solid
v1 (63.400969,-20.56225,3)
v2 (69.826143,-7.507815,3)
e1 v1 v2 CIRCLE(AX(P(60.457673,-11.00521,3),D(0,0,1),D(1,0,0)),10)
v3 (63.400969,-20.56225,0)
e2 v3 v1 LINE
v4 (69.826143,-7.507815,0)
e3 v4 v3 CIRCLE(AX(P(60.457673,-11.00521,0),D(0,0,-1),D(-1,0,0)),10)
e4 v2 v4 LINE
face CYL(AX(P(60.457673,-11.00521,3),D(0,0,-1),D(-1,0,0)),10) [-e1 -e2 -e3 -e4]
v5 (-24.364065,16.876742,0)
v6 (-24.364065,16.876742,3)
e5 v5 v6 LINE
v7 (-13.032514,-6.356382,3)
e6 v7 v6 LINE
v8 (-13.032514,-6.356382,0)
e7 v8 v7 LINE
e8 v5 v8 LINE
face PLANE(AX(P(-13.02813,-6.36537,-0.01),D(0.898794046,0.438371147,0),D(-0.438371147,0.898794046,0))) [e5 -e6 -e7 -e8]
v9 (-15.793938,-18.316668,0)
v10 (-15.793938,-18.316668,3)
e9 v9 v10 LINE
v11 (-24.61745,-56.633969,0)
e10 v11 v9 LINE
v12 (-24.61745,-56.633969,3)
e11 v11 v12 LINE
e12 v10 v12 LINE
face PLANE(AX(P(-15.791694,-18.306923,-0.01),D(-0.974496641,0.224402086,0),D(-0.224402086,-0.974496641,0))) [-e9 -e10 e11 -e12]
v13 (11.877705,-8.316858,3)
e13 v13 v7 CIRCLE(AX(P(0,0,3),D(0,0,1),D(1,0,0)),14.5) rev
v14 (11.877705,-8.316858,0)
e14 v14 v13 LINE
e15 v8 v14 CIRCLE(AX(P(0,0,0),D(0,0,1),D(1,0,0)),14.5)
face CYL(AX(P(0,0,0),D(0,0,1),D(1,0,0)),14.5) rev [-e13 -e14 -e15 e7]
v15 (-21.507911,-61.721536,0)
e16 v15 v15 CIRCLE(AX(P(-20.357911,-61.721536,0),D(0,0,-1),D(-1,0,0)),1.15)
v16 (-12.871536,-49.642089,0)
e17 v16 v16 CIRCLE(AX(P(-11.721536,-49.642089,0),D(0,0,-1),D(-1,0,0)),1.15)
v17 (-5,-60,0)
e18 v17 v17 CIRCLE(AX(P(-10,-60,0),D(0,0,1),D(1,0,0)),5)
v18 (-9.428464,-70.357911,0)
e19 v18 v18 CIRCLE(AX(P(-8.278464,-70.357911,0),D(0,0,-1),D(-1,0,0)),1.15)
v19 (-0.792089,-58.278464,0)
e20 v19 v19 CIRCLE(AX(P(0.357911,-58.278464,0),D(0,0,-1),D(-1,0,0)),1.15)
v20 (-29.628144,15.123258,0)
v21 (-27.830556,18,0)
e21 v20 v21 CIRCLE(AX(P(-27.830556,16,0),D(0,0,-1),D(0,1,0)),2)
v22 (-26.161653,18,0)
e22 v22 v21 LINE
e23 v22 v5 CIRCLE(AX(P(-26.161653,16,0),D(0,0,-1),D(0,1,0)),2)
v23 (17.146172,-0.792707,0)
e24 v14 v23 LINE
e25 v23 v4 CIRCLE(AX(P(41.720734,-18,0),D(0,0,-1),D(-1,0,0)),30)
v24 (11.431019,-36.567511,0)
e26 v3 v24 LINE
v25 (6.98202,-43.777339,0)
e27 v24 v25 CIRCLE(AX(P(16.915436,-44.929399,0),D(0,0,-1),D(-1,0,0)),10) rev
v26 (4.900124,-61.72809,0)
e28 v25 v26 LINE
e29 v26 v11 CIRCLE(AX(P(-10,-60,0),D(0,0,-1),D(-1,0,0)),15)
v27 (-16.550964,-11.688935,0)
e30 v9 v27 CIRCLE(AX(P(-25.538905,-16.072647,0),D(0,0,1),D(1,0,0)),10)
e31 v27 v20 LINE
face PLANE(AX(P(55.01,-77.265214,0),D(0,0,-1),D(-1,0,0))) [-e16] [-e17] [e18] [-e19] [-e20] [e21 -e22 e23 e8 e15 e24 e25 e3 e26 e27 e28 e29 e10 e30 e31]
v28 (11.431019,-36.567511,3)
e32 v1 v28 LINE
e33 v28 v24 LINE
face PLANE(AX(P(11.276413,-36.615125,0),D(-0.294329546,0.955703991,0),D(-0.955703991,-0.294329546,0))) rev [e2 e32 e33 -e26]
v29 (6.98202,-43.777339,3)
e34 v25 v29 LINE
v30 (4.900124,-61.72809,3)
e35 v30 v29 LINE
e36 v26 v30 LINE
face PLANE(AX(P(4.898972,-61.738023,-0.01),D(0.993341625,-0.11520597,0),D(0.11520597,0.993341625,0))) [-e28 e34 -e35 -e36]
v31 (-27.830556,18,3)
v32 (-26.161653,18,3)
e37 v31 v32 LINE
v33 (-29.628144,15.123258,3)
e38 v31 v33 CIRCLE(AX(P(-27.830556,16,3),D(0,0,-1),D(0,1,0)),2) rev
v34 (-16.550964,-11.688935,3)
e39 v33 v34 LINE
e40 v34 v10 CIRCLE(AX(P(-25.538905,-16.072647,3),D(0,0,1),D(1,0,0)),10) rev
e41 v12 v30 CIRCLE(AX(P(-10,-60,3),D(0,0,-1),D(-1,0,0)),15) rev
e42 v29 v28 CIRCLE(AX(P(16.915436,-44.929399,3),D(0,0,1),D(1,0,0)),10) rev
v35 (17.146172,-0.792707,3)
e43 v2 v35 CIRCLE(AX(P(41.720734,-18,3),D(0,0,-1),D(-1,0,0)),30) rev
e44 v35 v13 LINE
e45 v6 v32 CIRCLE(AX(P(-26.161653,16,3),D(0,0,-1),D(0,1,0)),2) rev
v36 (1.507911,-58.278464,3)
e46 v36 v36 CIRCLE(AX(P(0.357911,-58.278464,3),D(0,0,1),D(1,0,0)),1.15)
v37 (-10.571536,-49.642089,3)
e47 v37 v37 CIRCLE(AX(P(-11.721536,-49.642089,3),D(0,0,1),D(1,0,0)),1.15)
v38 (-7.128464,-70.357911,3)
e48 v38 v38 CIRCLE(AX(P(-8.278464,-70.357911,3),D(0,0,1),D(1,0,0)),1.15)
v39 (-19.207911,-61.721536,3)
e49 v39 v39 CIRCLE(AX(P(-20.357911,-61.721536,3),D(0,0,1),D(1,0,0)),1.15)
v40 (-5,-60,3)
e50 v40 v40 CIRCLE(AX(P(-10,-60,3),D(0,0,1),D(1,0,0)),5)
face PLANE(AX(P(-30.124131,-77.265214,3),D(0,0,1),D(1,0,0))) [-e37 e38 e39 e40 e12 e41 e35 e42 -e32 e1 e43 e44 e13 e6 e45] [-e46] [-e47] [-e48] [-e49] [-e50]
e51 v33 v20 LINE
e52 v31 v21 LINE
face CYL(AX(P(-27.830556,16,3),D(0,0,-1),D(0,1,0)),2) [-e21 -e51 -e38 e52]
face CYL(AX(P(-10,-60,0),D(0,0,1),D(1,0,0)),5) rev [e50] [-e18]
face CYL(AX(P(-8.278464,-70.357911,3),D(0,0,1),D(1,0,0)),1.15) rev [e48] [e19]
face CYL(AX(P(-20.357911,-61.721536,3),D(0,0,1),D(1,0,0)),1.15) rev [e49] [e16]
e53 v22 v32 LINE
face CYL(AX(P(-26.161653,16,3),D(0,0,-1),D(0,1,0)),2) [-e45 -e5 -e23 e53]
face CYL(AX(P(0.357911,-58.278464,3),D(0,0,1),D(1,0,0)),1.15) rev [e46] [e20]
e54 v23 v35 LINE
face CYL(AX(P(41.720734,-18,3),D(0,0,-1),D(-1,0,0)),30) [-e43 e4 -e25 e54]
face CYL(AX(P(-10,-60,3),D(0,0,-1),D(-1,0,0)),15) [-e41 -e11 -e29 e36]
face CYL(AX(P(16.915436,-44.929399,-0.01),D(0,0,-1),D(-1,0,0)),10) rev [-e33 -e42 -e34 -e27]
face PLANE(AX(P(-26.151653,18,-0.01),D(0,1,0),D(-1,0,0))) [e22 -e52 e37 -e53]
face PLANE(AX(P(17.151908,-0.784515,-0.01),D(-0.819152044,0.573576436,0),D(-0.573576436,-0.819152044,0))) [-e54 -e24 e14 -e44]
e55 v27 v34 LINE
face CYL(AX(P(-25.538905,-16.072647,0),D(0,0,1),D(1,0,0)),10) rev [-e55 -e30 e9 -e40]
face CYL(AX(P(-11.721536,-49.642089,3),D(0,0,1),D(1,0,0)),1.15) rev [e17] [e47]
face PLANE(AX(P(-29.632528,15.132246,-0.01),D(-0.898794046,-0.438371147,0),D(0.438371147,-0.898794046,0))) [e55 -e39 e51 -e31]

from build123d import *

# Parameters (mm, degrees)
BOSS_EXTRUDE1_START            = -3
BOSS_EXTRUDE1_OUTLINE_R        = 2.5
BOSS_EXTRUDE1_DEPTH            = 3
FILLET1_R                      = 10
BOSS_EXTRUDE2_START            = -3
BOSS_EXTRUDE2_DEPTH            = 3
CUT_EXTRUDE1_START             = -3
CUT_EXTRUDE1_DEPTH             = 3
FILLET2_R                      = 10
F_2_3_2_3_DIAMETER_HOLE1_D     = 2.3
F_2_3_2_3_DIAMETER_HOLE1_DEPTH = 10
F_2_3_2_3_DIAMETER_HOLE1_TIP   = 0.690989712
SKETCH6_R                      = 5
CUT_EXTRUDE2_DEPTH             = 103.947966144


with BuildPart() as part:
    # Boss-Extrude1: read off the stored shape, not the designer's step
    # Boss-Extrude1 outline → Boss-Extrude1 (new body)
    with BuildSketch(Plane.XY.offset(3).offset(BOSS_EXTRUDE1_START)):
        with BuildLine():
            ThreePointArc((-24.364065342, 16.876742294), (-25.101814907, 17.696096192), (-26.161653435, 18))
            Line((-26.161653435, 18), (-27.830556346, 18))
            ThreePointArc((-27.830556346, 18), (-29.526652538, 17.059838528), (-29.628144438, 15.123257706))
            Line((-29.628144438, 15.123257706), (-16.550964109, -11.68893536))
            ThreePointArc((-16.550964109, -11.68893536), (-15.603505287, -14.937815984), (-15.793938159, -18.316667689))
            Line((-15.793938159, -18.316667689), (-24.617449619, -56.633968709))
            ThreePointArc((-24.617449619, -56.633968709), (-12.550978841, -74.781492041), (4.900124379, -61.728089553))
            Line((4.900124379, -61.728089553), (7.520756747, -39.132184047))
            Line((7.520756747, -39.132184047), (57.484416951, -6.361887987))
            ThreePointArc((57.484416951, -6.361887987), (61.581724267, 4.861915454), (52, 12))
            Line((52, 12), (41.720733512, 12))
            ThreePointArc((41.720733512, 12), (27.868275115, 8.610324995), (17.146172183, -0.792706909))
            Line((17.146172183, -0.792706909), (11.877704642, -8.316858327))
            ThreePointArc((11.877704642, -8.316858327), (-1.137656888, -14.455301339), (-13.032513671, -6.356381628))
            Line((-13.032513671, -6.356381628), (-24.364065342, 16.876742294))
        make_face()
        with Locations((-10, -60)):
            Circle(BOSS_EXTRUDE1_OUTLINE_R, mode=Mode.SUBTRACT)
    extrude(amount=BOSS_EXTRUDE1_DEPTH)

    # Fillet1
    fillet1_edges = [part.edges().sort_by_distance(p)[0] for p in [
        (7.520756747, -39.132184047, 1.5),
    ]]
    fillet(fillet1_edges, radius=FILLET1_R)

    # Sketch2 → Boss-Extrude2 (add)
    with BuildSketch(Plane.XY.offset(3).offset(BOSS_EXTRUDE2_START)):
        with BuildLine():
            Line((11.431019345, -36.567510792), (71.720733512, -18))
            ThreePointArc((71.720733512, -18), (69.105682696, -5.749915992), (61.716429632, 4.364528537))
            ThreePointArc((61.716429632, 4.364528537), (61.302173782, -1.670090316), (57.484416951, -6.361887987))
            Line((57.484416951, -6.361887987), (11.431019345, -36.567510792))
        make_face()
    extrude(amount=BOSS_EXTRUDE2_DEPTH)

    # Sketch2<4> → Cut-Extrude1 (cut)
    with BuildSketch(Plane.XY.offset(3).offset(CUT_EXTRUDE1_START)):
        with BuildLine():
            ThreePointArc((41.720733512, 12), (52.42269931, 10.026200742), (61.716429632, 4.364528537))
            ThreePointArc((61.716429632, 4.364528537), (58.178782835, 9.862737607), (52, 12))
            Line((52, 12), (41.720733512, 12))
        make_face()
    extrude(amount=CUT_EXTRUDE1_DEPTH, mode=Mode.SUBTRACT)

    # Fillet2
    fillet2_edges = [part.edges().sort_by_distance(p)[0] for p in [
        (71.720733512, -18, 1.5),
    ]]
    fillet(fillet2_edges, radius=FILLET2_R)

    # Ø2.3 (2.3) Diameter Hole1
    with Locations(Plane.XY.offset(3)):
        with Locations((-20.357910666, -61.721536128), (-11.721536128, -49.642089334), (-8.278463872, -70.357910666), (0.357910666, -58.278463872)):
            Hole(F_2_3_2_3_DIAMETER_HOLE1_D / 2, depth=F_2_3_2_3_DIAMETER_HOLE1_DEPTH)
            with Locations((0, 0, -(F_2_3_2_3_DIAMETER_HOLE1_DEPTH + F_2_3_2_3_DIAMETER_HOLE1_TIP / 2))):  # 118° drill point
                Cone(0, F_2_3_2_3_DIAMETER_HOLE1_D / 2, F_2_3_2_3_DIAMETER_HOLE1_TIP, mode=Mode.SUBTRACT)

    # Sketch6 → Cut-Extrude2 (cut, through all)
    with BuildSketch(Plane.XY.offset(3)):
        with Locations((-10, -60)):
            Circle(SKETCH6_R)
    extrude(amount=-CUT_EXTRUDE2_DEPTH, mode=Mode.SUBTRACT)


solid = part.part
